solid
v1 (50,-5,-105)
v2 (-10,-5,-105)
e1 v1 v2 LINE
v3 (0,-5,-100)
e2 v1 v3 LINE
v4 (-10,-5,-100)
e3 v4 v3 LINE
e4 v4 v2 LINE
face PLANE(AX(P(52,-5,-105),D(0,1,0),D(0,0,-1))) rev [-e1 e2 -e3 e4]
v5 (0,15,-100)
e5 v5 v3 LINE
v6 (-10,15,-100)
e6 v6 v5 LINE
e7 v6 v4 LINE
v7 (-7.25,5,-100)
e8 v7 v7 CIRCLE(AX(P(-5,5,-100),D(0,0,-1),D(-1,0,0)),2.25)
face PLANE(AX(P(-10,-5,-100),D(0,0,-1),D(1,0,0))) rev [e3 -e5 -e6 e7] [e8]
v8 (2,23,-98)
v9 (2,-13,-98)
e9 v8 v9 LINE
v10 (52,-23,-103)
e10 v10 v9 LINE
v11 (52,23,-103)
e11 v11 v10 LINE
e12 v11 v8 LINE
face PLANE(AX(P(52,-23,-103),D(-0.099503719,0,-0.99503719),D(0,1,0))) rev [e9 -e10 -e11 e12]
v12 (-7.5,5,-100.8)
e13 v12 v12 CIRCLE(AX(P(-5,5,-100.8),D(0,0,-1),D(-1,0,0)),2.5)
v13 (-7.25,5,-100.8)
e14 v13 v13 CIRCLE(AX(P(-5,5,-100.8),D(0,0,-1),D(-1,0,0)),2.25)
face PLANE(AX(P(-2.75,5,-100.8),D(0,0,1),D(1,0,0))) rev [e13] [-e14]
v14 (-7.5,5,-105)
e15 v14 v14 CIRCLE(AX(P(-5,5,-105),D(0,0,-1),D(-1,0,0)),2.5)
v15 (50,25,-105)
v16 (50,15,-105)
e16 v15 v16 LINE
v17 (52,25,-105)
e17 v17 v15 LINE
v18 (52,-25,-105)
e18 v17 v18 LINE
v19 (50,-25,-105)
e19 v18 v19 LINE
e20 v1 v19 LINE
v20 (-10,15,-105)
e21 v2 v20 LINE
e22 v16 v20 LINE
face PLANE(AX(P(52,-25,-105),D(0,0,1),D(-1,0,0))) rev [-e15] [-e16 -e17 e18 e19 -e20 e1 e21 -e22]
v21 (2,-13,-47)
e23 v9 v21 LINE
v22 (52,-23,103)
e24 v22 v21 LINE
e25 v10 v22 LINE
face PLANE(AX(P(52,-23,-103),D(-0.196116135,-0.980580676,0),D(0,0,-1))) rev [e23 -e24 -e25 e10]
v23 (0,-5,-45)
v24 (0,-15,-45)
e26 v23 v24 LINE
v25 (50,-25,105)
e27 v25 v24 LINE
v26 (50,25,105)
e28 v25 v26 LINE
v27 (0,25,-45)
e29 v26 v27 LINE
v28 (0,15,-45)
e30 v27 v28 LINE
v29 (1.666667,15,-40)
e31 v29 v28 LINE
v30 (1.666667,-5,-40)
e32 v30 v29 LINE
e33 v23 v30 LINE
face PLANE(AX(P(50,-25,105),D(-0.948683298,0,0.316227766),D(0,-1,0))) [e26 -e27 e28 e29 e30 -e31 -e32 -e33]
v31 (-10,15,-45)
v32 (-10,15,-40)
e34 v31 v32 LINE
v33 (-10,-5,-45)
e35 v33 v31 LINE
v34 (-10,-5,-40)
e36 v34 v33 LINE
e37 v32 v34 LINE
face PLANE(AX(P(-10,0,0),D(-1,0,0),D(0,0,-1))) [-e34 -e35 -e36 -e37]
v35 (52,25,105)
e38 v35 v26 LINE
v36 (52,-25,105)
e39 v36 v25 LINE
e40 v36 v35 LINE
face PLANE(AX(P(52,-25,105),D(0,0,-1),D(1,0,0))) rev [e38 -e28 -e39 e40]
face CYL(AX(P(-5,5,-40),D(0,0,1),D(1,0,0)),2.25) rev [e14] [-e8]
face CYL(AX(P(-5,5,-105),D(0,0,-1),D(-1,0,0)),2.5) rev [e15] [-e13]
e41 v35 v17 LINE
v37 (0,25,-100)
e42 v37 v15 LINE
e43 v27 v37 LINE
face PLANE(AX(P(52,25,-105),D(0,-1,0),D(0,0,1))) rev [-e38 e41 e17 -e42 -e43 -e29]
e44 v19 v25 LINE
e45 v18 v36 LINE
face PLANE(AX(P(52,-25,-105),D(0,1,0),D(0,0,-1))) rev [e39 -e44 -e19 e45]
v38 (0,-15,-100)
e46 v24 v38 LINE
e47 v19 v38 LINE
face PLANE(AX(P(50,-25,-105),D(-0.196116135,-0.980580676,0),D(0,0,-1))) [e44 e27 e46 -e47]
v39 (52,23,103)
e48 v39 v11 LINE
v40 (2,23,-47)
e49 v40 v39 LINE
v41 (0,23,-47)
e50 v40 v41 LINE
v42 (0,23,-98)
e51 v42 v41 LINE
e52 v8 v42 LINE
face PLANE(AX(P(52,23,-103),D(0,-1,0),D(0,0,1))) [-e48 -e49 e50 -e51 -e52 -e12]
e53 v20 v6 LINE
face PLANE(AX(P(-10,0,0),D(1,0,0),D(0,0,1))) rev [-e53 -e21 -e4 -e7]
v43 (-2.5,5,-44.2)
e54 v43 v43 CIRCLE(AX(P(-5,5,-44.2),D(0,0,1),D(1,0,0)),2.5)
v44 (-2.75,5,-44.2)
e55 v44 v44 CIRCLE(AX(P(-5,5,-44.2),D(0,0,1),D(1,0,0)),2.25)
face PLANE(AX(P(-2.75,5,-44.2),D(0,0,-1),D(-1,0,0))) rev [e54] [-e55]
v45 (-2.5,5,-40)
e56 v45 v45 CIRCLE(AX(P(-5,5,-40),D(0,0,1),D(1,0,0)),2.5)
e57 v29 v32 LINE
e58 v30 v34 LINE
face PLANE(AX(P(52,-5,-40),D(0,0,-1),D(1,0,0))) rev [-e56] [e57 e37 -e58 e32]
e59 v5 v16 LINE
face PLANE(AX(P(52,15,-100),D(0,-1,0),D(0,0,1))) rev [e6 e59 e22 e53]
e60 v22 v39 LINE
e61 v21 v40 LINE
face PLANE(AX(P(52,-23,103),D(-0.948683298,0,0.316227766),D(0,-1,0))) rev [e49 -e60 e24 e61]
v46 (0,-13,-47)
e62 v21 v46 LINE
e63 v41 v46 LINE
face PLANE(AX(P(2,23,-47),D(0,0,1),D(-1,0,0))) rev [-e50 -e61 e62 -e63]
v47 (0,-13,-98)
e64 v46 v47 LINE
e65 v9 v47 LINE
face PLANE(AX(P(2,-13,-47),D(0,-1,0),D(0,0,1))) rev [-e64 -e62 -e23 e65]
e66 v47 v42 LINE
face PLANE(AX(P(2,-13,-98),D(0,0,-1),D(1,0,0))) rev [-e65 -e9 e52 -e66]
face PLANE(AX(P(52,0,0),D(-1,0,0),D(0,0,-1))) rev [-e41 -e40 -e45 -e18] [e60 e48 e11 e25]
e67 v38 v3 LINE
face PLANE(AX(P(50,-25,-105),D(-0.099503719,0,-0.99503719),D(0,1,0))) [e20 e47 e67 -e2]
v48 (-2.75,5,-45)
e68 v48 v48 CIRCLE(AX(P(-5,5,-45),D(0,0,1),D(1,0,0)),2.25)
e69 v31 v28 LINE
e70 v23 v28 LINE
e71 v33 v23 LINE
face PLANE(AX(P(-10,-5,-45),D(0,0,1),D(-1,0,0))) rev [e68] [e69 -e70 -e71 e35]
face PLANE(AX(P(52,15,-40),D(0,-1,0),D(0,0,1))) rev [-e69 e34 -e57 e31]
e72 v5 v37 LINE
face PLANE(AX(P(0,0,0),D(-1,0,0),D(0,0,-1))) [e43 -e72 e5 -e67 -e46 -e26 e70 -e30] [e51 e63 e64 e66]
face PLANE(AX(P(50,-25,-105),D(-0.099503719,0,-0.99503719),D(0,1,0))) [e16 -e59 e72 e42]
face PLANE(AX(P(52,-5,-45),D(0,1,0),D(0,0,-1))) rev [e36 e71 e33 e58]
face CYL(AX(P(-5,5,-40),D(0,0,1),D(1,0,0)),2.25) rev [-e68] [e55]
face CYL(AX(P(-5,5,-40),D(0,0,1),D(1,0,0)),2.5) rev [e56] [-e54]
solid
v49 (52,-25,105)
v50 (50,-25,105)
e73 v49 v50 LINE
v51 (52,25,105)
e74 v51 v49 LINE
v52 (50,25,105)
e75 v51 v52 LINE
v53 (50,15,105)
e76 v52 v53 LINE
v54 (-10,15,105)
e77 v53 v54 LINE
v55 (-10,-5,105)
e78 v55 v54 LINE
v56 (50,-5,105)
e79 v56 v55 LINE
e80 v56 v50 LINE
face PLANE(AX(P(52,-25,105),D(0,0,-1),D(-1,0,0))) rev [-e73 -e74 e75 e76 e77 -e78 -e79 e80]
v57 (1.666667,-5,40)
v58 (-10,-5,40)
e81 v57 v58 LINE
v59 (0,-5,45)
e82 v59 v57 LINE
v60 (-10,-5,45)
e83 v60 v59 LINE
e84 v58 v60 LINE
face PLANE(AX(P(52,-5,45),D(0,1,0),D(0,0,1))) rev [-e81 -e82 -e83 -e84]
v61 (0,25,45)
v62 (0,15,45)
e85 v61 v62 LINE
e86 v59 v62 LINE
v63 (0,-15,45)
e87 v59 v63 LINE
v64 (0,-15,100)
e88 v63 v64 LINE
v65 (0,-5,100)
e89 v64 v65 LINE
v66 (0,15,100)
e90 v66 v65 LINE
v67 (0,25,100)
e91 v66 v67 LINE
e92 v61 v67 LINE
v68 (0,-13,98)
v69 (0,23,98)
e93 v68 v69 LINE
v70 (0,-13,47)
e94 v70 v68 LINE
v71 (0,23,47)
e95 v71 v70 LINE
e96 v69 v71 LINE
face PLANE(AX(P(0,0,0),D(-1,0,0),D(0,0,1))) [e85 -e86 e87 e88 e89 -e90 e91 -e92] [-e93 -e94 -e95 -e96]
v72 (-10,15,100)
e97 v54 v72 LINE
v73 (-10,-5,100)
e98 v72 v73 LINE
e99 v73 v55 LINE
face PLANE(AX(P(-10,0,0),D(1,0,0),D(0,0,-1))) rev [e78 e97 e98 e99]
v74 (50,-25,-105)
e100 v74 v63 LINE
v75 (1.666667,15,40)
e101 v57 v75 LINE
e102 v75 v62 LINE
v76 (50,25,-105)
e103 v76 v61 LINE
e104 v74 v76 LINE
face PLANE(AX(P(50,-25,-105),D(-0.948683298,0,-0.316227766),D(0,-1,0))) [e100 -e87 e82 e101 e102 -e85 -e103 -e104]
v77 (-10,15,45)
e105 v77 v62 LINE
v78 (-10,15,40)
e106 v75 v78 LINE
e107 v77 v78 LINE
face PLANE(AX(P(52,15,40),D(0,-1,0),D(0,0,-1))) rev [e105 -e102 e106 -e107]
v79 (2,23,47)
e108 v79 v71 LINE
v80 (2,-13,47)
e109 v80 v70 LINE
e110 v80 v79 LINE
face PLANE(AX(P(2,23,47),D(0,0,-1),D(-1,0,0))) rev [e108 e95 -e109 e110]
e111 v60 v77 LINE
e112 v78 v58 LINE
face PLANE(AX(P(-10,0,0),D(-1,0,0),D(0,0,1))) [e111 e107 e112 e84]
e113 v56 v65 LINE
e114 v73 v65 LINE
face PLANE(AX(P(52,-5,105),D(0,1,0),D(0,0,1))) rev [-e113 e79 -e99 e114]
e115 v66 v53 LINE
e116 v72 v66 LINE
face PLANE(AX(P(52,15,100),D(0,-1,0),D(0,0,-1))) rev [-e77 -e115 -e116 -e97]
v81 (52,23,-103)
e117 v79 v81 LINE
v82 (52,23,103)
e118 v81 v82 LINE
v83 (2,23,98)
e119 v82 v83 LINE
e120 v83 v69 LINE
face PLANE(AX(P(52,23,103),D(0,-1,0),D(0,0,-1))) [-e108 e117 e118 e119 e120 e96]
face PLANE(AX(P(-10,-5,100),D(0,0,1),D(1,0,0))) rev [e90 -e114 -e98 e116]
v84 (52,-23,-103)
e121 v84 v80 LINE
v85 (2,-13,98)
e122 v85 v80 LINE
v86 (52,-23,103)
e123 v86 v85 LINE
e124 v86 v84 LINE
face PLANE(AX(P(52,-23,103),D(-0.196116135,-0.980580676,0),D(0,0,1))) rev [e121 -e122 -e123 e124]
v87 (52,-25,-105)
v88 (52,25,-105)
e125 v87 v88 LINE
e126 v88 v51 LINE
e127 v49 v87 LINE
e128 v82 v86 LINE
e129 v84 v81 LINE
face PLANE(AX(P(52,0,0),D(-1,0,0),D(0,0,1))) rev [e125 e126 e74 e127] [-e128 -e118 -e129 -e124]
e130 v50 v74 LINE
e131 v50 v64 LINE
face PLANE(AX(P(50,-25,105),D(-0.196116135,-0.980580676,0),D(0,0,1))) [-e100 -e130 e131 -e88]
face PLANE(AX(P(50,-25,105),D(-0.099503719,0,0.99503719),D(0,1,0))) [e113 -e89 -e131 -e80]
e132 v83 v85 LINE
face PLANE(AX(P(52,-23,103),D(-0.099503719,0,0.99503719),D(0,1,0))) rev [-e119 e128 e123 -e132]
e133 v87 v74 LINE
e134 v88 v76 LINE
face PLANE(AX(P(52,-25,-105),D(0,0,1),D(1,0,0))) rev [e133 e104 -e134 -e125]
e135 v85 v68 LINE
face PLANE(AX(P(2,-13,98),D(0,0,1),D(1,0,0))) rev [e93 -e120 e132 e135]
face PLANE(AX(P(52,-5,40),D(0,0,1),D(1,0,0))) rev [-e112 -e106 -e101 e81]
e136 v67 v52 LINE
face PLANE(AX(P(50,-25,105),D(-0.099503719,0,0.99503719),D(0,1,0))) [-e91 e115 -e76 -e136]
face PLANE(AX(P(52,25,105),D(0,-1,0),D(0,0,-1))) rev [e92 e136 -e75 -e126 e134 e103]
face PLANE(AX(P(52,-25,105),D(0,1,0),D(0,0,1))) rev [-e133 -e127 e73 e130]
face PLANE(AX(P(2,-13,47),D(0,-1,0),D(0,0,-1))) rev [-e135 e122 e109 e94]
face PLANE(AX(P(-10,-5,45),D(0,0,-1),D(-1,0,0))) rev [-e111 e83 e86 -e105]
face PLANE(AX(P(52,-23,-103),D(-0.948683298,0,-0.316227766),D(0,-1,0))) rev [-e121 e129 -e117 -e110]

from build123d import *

# Parameters (mm, degrees)
SKETCH1_W             = 210
SKETCH1_H             = 50
SKETCH1_W_2           = 206
SKETCH1_H_2           = 46
BOSS_EXTRUDE3_DEPTH   = 52
SKETCH3_W             = 210
SKETCH3_H             = 50
BOSS_EXTRUDE4_DEPTH   = 2
CHAMFER1_SIZE         = 50
CHAMFER1_SIZE_2       = 5
CHAMFER2_SIZE         = 10
CHAMFER2_SIZE_2       = 50
CHAMFER3_SIZE2        = 150
CHAMFER3_SIZE         = 50
CHAMFER4_SIZE         = 150
CHAMFER4_SIZE2        = 50
CHAMFER5_SIZE         = 10
CHAMFER5_SIZE2        = 50
CHAMFER6_SIZE         = 5
CHAMFER6_SIZE2        = 50
SKETCH4_W             = 51
SKETCH4_H             = 36
CUT_EXTRUDE2_DEPTH    = 2
SKETCH5_W             = 5
SKETCH5_H             = 20
BOSS_EXTRUDE5_DEPTH   = 10
BOSS_EXTRUDE5_2_DEPTH = 10
SKETCH6_W             = 5
SKETCH6_H             = 20
BOSS_EXTRUDE6_DEPTH   = 52
CUT_EXTRUDE3_DEPTH    = 36


# Some blends are built 0.0001 mm under size
with BuildPart() as part:
    # Sketch1 → Boss-Extrude3 (new body)
    with BuildSketch(Plane(origin=(0, 0, 0), x_dir=(0, 0, -1), z_dir=(1, 0, 0))):
        Rectangle(SKETCH1_W, SKETCH1_H)
        Rectangle(SKETCH1_W_2, SKETCH1_H_2, mode=Mode.SUBTRACT)
    extrude(amount=BOSS_EXTRUDE3_DEPTH)

    # Sketch3 → Boss-Extrude4 (add)
    with BuildSketch(Plane.ZY):
        Rectangle(SKETCH3_W, SKETCH3_H)
    extrude(amount=-BOSS_EXTRUDE4_DEPTH)

    # Chamfer1
    # the kernel refuses this chamfer: 50, 5 mm, written as the material it adds along each edge
    with BuildSketch(Plane(origin=(2, 23, 103), x_dir=(0.9999926740665032, 0, 0.0038277687135160926), z_dir=(0, -1, 0))) as chamfer1_piece_1_section:
        Polygon((CHAMFER1_SIZE * 0.999992674067, -CHAMFER1_SIZE * 0.00382776871352), (-CHAMFER1_SIZE_2 * 0.00382776871352, -CHAMFER1_SIZE_2 * 0.999992674067), (0, 0), align=None)
    chamfer1_piece_1 = extrude(amount=46, mode=Mode.PRIVATE)
    chamfer1_piece_1 = split(chamfer1_piece_1, bisect_by=Plane(origin=(52, 0, 101.896942332), z_dir=(-1, 0, 0)), keep=Keep.TOP, mode=Mode.PRIVATE)
    add(chamfer1_piece_1)

    # Chamfer2
    # the kernel refuses this chamfer: 50, 10 mm, written as the material it adds along each edge
    with BuildSketch(Plane(origin=(2, -23, 227.906604315), x_dir=(-0.18544098588999025, 0.9826554028509427, 0), z_dir=(0, 0, -1))) as chamfer2_piece_1_section:
        Polygon((CHAMFER2_SIZE * 0.982655402851, CHAMFER2_SIZE * 0.18544098589), (-CHAMFER2_SIZE_2 * 0.18544098589, CHAMFER2_SIZE_2 * 0.982655402851), (0, 0), align=None)
    chamfer2_piece_1 = extrude(amount=330.906604315, mode=Mode.PRIVATE)
    chamfer2_piece_1 = split(chamfer2_piece_1, bisect_by=Plane(origin=(9.567041137, -20.198584672, 98.756704114), z_dir=(0.09950371902147655, 0, -0.9950371902099414)), keep=Keep.TOP, mode=Mode.PRIVATE)
    chamfer2_piece_1 = split(chamfer2_piece_1, bisect_by=Plane(origin=(52, -20.198584672, -1.619765595), z_dir=(-1, 0, 0)), keep=Keep.TOP, mode=Mode.PRIVATE)
    add(chamfer2_piece_1)

    # Chamfer3
    chamfer3_edges = [part.edges().sort_by_distance(p)[0] for p in [
        (2, 5, -103),
    ]]
    chamfer3_side = [part.faces().sort_by_distance(p)[0] for p in [
        (3, 5, -103),
    ]]
    chamfer(chamfer3_edges, length=CHAMFER3_SIZE - 0.0001, length2=CHAMFER3_SIZE2 - 0.0001, reference=chamfer3_side[0])  # a hair under: the kernel refuses the full size

    # Chamfer4
    chamfer4_edges = [part.edges().sort_by_distance(p)[0] for p in [
        (0, 0, -105),
    ]]
    chamfer4_side = [part.faces().sort_by_distance(p)[0] for p in [
        (0, 0, 0),
    ]]
    chamfer(chamfer4_edges, length=CHAMFER4_SIZE, length2=CHAMFER4_SIZE2, reference=chamfer4_side[0])

    # Chamfer5
    chamfer5_edges = [part.edges().sort_by_distance(p)[0] for p in [
        (0, -25, 75),
    ]]
    chamfer5_side = [part.faces().sort_by_distance(p)[0] for p in [
        (0, 0, 75),
    ]]
    chamfer(chamfer5_edges, length=CHAMFER5_SIZE, length2=CHAMFER5_SIZE2, reference=chamfer5_side[0])

    # Chamfer6
    chamfer6_edges = [part.edges().sort_by_distance(p)[0] for p in [
        (0, 5, 105),
    ]]
    chamfer6_side = [part.faces().sort_by_distance(p)[0] for p in [
        (0, 5, 75),
    ]]
    chamfer(chamfer6_edges, length=CHAMFER6_SIZE, length2=CHAMFER6_SIZE2, reference=chamfer6_side[0])

    # Sketch4 → Cut-Extrude2 (cut)
    with BuildSketch(Plane.ZY):
        with Locations((72.5, 5)):
            Rectangle(SKETCH4_W, SKETCH4_H)
    extrude(amount=-CUT_EXTRUDE2_DEPTH, mode=Mode.SUBTRACT)



with BuildPart() as body_2:
    # Sketch5 → Boss-Extrude5 (new body)
    with BuildSketch(Plane.ZY):
        with Locations((102.5, 5)):
            Rectangle(SKETCH5_W, SKETCH5_H)
    extrude(amount=BOSS_EXTRUDE5_DEPTH)


with BuildPart() as body_3:
    # Sketch5 → Boss-Extrude5 2 (new body)
    with BuildSketch(Plane.ZY):
        with Locations((42.5, 5)):
            Rectangle(SKETCH5_W, SKETCH5_H)
    extrude(amount=BOSS_EXTRUDE5_2_DEPTH)


with BuildPart() as part_1:
    add(part.part)

    add(body_2.part)  # Boss-Extrude6 merges body 2

    add(body_3.part)  # Boss-Extrude6 merges body 3
    # Sketch6 → Boss-Extrude6 (add)
    with BuildSketch(Plane(origin=(0, 0, 0), x_dir=(0, 0, -1), z_dir=(1, 0, 0))):
        with Locations((-42.5, 5)):
            Rectangle(SKETCH6_W, SKETCH6_H)
        with Locations((-102.5, 5)):
            Rectangle(SKETCH6_W, SKETCH6_H)
    extrude(amount=BOSS_EXTRUDE6_DEPTH)

    # Sketch7 → Cut-Extrude3 (cut)
    with BuildSketch(Plane(origin=(0, -13, 0), x_dir=(1, 0, 0), z_dir=(0, 1, 0))):
        Polygon((52, -103), (52, 103), (2, -47), (2, -98), align=None)
    extrude(amount=CUT_EXTRUDE3_DEPTH, mode=Mode.SUBTRACT)


with BuildPart() as body_2_2:
    # Mirror1: mirrored copy
    add(part_1.part.mirror(Plane.XY))

    # Sketch12 → CBORE for M5 Hex Head Bolt2 (revolve, cut)
    with BuildSketch(Plane(origin=(-5, 5, -40), x_dir=(0, -1, 0), z_dir=(1, 0, 0))):
        Polygon((0, 0), (0, 65), (2.25, 65), (2.25, 4.2), (2.5, 4.2), (2.5, 0), align=None)
    revolve(axis=Axis((-5, 5, -33.65), (0, 0, -1)), mode=Mode.SUBTRACT)

    # Sketch14 → CBORE for M5 Hex Head Bolt3 (revolve, cut)
    with BuildSketch(Plane(origin=(-5, 5, -105), x_dir=(0, 1, 0), z_dir=(1, 0, 0))):
        Polygon((0, 0), (0, 210), (2.25, 210), (2.25, 4.2), (2.5, 4.2), (2.5, 0), align=None)
    revolve(axis=Axis((-5, 5, -111.35), (0, 0, 1)), mode=Mode.SUBTRACT)


solid = Compound([part_1.part, body_2_2.part])
